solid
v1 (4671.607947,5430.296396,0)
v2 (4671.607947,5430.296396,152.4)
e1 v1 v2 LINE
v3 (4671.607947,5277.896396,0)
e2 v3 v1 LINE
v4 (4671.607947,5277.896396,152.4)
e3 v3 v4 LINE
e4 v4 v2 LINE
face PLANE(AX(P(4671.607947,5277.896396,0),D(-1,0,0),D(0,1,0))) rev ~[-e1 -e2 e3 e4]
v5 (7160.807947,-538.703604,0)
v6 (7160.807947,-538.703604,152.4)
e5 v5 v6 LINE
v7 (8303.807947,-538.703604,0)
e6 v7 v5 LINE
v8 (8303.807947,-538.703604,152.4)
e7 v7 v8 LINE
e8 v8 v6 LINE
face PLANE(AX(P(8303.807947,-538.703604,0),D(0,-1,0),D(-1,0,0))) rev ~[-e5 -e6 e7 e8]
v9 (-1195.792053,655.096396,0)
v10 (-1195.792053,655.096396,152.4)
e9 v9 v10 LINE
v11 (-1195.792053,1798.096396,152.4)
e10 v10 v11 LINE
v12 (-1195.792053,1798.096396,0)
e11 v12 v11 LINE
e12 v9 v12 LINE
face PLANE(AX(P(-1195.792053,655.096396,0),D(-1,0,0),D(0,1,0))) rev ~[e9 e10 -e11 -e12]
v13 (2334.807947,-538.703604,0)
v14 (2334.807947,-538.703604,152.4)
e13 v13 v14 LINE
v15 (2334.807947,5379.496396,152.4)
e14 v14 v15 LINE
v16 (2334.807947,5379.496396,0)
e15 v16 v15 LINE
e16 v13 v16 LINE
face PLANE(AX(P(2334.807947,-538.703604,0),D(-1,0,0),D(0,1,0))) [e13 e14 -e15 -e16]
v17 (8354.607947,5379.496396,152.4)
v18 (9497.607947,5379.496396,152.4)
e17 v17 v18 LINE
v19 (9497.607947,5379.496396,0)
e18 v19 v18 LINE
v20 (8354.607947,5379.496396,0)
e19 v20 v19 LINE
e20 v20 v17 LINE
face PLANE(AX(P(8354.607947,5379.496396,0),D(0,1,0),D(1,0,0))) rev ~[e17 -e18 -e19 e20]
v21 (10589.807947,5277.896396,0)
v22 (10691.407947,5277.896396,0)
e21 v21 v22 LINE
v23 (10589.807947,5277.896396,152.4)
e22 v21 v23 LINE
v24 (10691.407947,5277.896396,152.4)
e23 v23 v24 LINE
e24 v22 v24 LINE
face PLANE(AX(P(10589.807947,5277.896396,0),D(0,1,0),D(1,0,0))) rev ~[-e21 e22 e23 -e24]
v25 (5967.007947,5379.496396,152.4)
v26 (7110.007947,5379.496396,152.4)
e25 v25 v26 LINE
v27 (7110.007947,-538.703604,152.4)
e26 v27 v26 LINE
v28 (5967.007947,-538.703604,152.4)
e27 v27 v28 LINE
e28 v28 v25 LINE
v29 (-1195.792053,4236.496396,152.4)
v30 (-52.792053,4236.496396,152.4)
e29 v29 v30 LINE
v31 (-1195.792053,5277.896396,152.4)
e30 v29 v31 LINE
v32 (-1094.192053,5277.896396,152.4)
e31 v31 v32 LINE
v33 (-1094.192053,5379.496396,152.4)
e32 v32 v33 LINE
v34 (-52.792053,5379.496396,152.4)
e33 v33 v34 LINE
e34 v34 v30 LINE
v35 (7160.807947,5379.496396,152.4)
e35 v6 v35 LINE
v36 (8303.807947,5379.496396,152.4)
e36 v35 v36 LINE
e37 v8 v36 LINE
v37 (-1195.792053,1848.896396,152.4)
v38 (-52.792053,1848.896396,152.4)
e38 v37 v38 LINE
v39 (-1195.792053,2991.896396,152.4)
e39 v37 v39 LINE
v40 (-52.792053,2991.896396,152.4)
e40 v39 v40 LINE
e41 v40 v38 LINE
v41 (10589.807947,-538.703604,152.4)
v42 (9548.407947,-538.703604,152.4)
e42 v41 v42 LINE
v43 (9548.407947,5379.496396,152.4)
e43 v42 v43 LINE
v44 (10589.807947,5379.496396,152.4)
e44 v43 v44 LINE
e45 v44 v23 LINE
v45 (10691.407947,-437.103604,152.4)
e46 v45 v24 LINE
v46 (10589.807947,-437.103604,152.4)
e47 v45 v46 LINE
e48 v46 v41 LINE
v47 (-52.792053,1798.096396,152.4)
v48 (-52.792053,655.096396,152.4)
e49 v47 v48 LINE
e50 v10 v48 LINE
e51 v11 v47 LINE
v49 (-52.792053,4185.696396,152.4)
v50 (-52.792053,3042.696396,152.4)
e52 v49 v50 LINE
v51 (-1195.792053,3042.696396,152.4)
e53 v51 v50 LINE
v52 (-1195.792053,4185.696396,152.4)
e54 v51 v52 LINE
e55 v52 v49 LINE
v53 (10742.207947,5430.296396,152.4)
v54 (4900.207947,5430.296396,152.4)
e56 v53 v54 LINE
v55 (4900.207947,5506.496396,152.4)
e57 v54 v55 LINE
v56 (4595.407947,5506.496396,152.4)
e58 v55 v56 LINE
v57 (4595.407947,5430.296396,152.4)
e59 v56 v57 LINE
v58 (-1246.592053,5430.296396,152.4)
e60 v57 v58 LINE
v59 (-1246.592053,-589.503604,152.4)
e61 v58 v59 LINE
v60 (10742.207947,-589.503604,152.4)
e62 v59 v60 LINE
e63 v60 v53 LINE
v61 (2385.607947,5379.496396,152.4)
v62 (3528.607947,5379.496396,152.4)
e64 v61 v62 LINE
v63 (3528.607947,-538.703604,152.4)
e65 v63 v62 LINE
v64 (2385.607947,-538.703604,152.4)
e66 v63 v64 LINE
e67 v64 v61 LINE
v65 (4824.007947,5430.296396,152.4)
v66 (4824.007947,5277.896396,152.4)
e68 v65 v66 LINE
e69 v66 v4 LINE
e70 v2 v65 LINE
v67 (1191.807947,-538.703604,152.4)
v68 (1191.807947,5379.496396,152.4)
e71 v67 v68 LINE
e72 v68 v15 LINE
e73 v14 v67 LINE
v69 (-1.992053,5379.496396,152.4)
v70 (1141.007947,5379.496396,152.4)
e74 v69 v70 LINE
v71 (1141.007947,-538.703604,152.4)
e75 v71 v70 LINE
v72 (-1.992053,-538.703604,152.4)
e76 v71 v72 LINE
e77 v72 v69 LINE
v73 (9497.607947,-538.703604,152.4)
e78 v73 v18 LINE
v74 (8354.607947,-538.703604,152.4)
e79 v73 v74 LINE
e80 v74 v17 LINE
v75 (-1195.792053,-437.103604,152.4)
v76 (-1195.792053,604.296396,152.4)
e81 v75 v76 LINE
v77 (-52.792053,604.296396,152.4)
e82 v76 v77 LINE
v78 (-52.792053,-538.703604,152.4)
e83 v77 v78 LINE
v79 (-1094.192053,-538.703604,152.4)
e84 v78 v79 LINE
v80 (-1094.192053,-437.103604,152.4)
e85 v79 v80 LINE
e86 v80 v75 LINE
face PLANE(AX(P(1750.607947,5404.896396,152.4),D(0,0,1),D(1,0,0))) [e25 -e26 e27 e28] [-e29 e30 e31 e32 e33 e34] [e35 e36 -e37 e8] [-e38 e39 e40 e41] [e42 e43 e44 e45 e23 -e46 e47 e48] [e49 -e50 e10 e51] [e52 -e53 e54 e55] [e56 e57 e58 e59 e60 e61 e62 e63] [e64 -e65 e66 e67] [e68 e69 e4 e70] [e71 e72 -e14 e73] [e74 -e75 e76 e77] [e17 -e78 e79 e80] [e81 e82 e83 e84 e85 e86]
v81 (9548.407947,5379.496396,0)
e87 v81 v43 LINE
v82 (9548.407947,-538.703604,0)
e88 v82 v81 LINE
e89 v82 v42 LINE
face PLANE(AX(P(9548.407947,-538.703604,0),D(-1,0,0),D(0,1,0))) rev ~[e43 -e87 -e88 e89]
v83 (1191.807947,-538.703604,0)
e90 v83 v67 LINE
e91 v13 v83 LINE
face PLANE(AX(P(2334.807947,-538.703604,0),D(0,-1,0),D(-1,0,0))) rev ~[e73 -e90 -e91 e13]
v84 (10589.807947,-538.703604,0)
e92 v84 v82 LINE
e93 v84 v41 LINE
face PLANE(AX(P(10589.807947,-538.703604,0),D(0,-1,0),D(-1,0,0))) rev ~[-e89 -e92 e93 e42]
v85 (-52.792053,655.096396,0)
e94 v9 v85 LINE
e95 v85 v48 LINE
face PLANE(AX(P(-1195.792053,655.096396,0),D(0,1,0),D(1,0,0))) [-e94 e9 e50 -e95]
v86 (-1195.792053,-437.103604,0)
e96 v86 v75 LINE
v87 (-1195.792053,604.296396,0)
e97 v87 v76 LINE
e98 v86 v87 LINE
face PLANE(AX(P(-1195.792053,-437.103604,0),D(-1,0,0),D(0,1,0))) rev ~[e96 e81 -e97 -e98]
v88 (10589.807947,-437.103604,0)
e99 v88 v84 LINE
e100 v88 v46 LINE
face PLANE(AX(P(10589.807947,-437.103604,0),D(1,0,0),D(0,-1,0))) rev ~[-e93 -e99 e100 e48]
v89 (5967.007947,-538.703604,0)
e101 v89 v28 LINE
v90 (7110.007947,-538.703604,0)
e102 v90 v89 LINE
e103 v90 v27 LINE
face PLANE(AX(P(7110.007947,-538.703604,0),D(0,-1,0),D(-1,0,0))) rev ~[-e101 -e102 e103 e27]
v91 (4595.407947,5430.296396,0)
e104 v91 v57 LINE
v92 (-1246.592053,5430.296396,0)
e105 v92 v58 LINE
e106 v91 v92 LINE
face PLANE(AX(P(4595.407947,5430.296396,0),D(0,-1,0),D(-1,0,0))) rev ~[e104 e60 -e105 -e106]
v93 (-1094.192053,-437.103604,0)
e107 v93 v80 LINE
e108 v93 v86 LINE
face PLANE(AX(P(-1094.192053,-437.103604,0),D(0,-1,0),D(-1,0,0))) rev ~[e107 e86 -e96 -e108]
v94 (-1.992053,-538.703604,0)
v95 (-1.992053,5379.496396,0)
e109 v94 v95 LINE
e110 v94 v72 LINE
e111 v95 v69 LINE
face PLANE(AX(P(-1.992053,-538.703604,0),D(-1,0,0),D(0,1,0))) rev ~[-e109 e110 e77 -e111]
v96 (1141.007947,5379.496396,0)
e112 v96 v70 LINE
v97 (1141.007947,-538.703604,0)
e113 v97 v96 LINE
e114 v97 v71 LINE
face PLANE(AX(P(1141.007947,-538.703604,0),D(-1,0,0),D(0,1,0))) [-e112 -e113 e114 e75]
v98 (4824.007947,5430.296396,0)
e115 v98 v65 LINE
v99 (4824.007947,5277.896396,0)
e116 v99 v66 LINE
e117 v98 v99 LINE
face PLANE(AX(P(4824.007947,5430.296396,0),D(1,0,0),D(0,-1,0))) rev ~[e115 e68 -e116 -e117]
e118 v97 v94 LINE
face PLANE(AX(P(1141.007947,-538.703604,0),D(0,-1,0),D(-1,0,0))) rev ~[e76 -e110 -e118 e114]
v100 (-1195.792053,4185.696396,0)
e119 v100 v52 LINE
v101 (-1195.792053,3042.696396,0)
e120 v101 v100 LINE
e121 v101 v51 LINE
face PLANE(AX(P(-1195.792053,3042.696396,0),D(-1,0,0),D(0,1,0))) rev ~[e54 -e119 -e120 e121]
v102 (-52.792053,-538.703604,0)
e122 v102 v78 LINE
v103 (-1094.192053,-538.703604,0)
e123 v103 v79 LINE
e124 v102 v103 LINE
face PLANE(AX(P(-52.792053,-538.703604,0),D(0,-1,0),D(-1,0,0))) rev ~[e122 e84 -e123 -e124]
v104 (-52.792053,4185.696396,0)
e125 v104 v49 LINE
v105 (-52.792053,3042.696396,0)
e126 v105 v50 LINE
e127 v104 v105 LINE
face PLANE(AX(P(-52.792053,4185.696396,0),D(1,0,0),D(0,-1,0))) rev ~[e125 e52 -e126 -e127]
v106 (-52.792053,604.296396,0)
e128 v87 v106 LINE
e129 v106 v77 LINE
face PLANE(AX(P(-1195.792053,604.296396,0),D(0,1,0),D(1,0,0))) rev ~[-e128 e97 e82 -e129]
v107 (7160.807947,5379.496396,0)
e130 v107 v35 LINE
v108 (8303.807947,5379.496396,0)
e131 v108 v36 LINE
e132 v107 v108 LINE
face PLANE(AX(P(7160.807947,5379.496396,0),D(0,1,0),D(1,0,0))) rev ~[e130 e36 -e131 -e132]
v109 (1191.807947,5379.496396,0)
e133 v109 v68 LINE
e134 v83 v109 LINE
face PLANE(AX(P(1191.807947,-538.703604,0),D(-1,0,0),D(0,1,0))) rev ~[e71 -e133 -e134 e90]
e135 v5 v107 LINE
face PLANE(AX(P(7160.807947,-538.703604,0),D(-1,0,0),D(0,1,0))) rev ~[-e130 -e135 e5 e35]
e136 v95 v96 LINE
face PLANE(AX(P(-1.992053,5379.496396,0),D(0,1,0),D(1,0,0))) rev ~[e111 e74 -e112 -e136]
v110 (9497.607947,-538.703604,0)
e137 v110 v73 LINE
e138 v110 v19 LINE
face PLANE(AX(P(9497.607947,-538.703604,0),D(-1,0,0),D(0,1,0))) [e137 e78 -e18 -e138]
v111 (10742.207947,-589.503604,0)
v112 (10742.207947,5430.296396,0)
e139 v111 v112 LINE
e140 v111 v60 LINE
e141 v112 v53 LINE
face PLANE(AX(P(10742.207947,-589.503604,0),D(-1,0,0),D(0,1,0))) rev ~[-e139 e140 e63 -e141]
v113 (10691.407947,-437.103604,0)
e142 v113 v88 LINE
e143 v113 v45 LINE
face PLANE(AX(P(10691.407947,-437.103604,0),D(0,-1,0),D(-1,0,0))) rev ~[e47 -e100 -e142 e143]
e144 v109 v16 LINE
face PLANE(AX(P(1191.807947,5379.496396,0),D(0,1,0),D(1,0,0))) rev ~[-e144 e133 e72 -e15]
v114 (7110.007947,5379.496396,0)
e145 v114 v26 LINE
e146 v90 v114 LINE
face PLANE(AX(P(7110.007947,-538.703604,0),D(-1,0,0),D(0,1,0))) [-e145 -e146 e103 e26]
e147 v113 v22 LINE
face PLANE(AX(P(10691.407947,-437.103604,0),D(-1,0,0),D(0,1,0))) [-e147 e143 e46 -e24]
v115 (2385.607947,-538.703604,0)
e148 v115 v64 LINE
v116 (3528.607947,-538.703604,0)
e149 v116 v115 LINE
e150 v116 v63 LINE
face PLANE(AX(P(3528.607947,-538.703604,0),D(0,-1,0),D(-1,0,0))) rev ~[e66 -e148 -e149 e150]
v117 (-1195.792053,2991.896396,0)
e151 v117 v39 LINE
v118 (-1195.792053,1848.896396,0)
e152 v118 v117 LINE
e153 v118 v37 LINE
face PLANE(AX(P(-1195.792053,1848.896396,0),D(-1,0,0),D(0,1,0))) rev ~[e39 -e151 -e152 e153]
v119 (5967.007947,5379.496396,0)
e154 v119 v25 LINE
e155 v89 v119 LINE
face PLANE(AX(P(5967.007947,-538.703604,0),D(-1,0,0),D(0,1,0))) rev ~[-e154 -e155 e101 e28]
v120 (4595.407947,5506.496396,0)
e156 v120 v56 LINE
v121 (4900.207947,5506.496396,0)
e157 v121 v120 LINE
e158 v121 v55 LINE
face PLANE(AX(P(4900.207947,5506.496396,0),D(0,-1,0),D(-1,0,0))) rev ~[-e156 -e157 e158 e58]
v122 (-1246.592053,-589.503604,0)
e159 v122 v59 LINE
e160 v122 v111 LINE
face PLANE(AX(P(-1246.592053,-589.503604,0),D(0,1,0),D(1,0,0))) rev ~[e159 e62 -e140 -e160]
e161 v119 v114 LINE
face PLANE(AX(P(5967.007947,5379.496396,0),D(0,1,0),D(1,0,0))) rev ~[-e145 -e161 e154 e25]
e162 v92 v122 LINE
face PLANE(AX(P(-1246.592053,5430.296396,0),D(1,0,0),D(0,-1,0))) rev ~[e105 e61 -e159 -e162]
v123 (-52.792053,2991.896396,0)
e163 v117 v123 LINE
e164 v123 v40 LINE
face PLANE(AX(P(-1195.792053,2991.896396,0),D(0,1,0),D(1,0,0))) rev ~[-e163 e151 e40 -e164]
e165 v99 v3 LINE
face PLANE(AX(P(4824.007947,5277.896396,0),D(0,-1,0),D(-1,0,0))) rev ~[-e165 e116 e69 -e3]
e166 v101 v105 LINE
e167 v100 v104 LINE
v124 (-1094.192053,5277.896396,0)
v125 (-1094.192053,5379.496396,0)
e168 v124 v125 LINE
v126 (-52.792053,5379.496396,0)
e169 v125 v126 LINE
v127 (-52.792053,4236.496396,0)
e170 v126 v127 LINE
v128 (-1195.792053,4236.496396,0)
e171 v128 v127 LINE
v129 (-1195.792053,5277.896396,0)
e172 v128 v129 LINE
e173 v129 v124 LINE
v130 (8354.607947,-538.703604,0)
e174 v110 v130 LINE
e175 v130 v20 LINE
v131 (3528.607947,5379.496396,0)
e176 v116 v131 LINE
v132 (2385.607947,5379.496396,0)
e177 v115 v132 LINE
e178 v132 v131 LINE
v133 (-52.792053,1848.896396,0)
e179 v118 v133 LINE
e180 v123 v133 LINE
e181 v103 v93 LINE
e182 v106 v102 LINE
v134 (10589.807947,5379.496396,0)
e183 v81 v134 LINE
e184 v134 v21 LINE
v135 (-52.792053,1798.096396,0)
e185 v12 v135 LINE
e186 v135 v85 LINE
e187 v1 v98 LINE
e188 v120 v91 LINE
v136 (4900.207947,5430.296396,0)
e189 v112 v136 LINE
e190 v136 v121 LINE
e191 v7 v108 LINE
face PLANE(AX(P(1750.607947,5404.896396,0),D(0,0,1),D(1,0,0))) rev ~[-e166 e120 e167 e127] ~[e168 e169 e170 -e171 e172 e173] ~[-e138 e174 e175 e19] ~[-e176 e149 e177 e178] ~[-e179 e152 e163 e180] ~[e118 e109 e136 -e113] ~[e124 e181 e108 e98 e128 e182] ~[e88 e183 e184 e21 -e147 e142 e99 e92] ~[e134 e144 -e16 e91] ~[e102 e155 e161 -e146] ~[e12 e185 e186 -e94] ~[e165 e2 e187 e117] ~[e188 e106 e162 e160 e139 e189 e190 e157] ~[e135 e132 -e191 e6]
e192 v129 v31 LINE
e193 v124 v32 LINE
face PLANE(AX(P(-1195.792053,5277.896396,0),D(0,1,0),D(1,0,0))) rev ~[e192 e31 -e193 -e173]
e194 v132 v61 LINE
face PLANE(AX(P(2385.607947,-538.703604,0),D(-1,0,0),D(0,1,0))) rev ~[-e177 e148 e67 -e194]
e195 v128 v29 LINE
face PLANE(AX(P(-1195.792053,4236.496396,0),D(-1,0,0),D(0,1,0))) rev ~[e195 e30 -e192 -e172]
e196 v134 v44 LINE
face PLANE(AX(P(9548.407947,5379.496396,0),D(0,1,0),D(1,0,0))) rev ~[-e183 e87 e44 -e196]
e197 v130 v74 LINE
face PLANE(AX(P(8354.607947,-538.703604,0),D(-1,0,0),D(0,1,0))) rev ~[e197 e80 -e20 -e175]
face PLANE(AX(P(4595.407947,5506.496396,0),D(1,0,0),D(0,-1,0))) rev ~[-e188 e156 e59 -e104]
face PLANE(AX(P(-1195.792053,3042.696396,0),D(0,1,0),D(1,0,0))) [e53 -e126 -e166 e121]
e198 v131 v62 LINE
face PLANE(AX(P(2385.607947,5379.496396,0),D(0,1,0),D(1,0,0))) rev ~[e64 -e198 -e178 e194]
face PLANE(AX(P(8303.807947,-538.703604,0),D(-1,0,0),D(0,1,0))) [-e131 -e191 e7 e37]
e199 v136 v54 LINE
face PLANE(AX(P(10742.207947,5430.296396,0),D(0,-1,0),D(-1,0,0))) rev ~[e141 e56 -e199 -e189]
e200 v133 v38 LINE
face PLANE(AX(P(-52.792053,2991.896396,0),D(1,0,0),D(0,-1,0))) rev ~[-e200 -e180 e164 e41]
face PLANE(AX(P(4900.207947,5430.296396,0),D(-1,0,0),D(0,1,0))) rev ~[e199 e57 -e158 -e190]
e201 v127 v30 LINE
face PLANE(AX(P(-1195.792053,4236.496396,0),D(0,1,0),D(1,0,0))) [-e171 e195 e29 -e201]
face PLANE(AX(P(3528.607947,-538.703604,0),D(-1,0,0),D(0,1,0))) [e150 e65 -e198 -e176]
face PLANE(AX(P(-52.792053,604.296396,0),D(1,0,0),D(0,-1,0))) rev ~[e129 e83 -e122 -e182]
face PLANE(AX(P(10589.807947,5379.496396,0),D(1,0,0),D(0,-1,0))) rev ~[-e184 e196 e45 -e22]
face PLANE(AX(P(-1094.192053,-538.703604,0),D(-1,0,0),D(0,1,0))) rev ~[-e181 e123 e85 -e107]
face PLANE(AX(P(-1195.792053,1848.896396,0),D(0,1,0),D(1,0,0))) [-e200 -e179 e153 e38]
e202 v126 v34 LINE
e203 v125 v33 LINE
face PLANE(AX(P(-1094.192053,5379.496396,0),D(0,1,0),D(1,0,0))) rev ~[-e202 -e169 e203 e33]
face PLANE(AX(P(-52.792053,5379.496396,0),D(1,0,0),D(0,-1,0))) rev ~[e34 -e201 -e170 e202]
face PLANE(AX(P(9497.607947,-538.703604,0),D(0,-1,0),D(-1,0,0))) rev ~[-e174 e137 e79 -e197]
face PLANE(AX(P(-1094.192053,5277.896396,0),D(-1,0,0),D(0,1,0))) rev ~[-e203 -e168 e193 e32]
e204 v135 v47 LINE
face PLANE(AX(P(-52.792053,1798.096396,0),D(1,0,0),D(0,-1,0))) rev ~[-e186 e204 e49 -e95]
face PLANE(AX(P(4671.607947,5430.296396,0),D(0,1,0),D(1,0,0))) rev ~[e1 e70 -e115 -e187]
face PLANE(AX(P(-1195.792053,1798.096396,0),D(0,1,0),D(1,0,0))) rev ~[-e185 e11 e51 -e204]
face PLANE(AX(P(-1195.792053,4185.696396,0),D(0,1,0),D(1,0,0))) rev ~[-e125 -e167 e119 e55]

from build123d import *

# Parameters (mm, degrees)
F0_W     = 50.8
F0_H     = 5918.2
F0_W_2   = 1143
F0_H_2   = 50.8
F0_W_3   = 76.2
F0_H_3   = 5740.4
F0_H_4   = 76.2
F0_H_5   = 5715
F1_DEPTH = 152.4


# Not quite as in the source:
# - a feature names something its author has since deleted; it is built from what else it names


with BuildPart() as f1:
    # F0 (on Top) → F1 (new body)
    with BuildSketch(Plane.XY):
        Polygon((-1.9920532227, 5379.496395874), (1141.0079467773, 5379.496395874), (1191.8079467773, 5379.496395874), (2334.8079467773, 5379.496395874), (2385.6079467774, 5379.496395874), (3528.6079467773, 5379.496395874), (3579.4079467774, 5379.496395874), (4595.4079467774, 5379.496395874), (4595.4079467774, 5430.296395874), (-1094.1920532227, 5430.296395874), (-1094.1920532227, 5379.496395874), (-52.7920532227, 5379.496395874), align=None)
        with Locations((1166.4079467773, 2420.396395874)):
            Rectangle(F0_W, F0_H)
        Polygon((1191.8079467773, -538.703604126), (1141.0079467773, -538.703604126), (-1.9920532227, -538.703604126), (-52.7920532227, -538.703604126), (-1094.1920532227, -538.703604126), (-1094.1920532227, -589.503604126), (10589.8079467774, -589.503604126), (10589.8079467774, -538.703604126), (9548.4079467774, -538.703604126), (9497.6079467774, -538.703604126), (8354.6079467774, -538.703604126), (8303.8079467774, -538.703604126), (7160.8079467774, -538.703604126), (7110.0079467774, -538.703604126), (5967.0079467774, -538.703604126), (5916.2079467774, -538.703604126), (4773.2079467774, -538.703604126), (4722.4079467774, -538.703604126), (3579.4079467774, -538.703604126), (3528.6079467774, -538.703604126), (2385.6079467774, -538.703604126), (2334.8079467773, -538.703604126), align=None)
        Polygon((-1.9920532227, -538.703604126), (-1.9920532227, 5379.496395874), (-52.7920532227, 5379.496395874), (-52.7920532227, 4236.496395874), (-52.7920532227, 4185.696395874), (-52.7920532227, 3042.696395874), (-52.7920532227, 2991.896395874), (-52.7920532227, 1848.896395874), (-52.7920532227, 1798.096395874), (-52.7920532227, 655.096395874), (-52.7920532227, 604.296395874), (-52.7920532227, -538.703604126), align=None)
        with Locations((2360.2079467773, 2420.396395874)):
            Rectangle(F0_W, F0_H)
        with Locations((-624.2920532227, 4211.096395874)):
            Rectangle(F0_W_2, F0_H_2)
        Polygon((-1094.1920532227, 5277.896395874), (-1094.1920532227, 5379.496395874), (-1094.1920532227, 5430.296395874), (-1246.5920532227, 5430.296395874), (-1246.5920532227, 5277.896395874), (-1195.7920532227, 5277.896395874), align=None)
        with Locations((3554.0079467774, 2420.396395874)):
            Rectangle(F0_W, F0_H)
        with Locations((-624.2920532227, 629.696395874)):
            Rectangle(F0_W_2, F0_H_2)
        Polygon((-1094.1920532227, -589.503604126), (-1094.1920532227, -538.703604126), (-1094.1920532227, -437.103604126), (-1195.7920532227, -437.103604126), (-1246.5920532227, -437.103604126), (-1246.5920532227, -589.503604126), align=None)
        Polygon((-1195.7920532227, 4185.696395874), (-1195.7920532227, 4236.496395874), (-1195.7920532227, 5277.896395874), (-1246.5920532227, 5277.896395874), (-1246.5920532227, -437.103604126), (-1195.7920532227, -437.103604126), (-1195.7920532227, 604.296395874), (-1195.7920532227, 655.096395874), (-1195.7920532227, 1798.096395874), (-1195.7920532227, 1848.896395874), (-1195.7920532227, 2991.896395874), (-1195.7920532227, 3042.696395874), align=None)
        Polygon((4595.4079467774, 5379.496395874), (3579.4079467774, 5379.496395874), (3579.4079467774, -538.703604126), (4722.4079467774, -538.703604126), (4722.4079467774, 5201.696395874), (4595.4079467774, 5201.696395874), align=None)
        with Locations((-624.2920532227, 3017.296395874)):
            Rectangle(F0_W_2, F0_H_2)
        Polygon((4595.4079467774, 5506.496395874), (4595.4079467774, 5430.296395874), (4671.6079467774, 5430.296395874), (4824.0079467774, 5430.296395874), (4900.2079467774, 5430.296395874), (4900.2079467774, 5506.496395874), align=None)
        with Locations((4633.5079467774, 5404.896395874)):
            Rectangle(F0_W_3, F0_H_2)
        Polygon((4671.6079467774, 5379.496395874), (4595.4079467774, 5379.496395874), (4595.4079467774, 5201.696395874), (4722.4079467774, 5201.696395874), (4722.4079467774, 5277.896395874), (4671.6079467774, 5277.896395874), align=None)
        with Locations((-624.2920532227, 1823.496395874)):
            Rectangle(F0_W_2, F0_H_2)
        Polygon((10589.8079467774, -538.703604126), (10589.8079467774, -589.503604126), (10742.2079467774, -589.503604126), (10742.2079467774, -437.103604126), (10691.4079467774, -437.103604126), (10589.8079467774, -437.103604126), align=None)
        with Locations((4747.8079467774, 2331.496395874)):
            Rectangle(F0_W, F0_H_3)
        with Locations((4862.1079467774, 5404.896395874)):
            Rectangle(F0_W_3, F0_H_2)
        Polygon((4773.2079467774, 5201.696395874), (4773.2079467774, -538.703604126), (5916.2079467774, -538.703604126), (5916.2079467774, 5379.496395874), (4900.2079467774, 5379.496395874), (4900.2079467774, 5201.696395874), align=None)
        with Locations((4747.8079467774, 5239.796395874)):
            Rectangle(F0_W, F0_H_4)
        with Locations((9523.0079467774, 2420.396395874)):
            Rectangle(F0_W, F0_H)
        with Locations((10716.8079467774, 2420.396395874)):
            Rectangle(F0_W, F0_H_5)
        Polygon((10589.8079467774, 5430.296395874), (4900.2079467774, 5430.296395874), (4900.2079467774, 5379.496395874), (5916.2079467774, 5379.496395874), (5967.0079467774, 5379.496395874), (7110.0079467774, 5379.496395874), (7160.8079467774, 5379.496395874), (8303.8079467774, 5379.496395874), (8354.6079467774, 5379.496395874), (9497.6079467774, 5379.496395874), (9548.4079467774, 5379.496395874), (10589.8079467774, 5379.496395874), align=None)
        Polygon((4900.2079467774, 5379.496395874), (4824.0079467774, 5379.496395874), (4824.0079467774, 5277.896395874), (4773.2079467774, 5277.896395874), (4773.2079467774, 5201.696395874), (4900.2079467774, 5201.696395874), align=None)
        with Locations((5941.6079467774, 2420.396395874)):
            Rectangle(F0_W, F0_H)
        Polygon((10691.4079467774, 5277.896395874), (10742.2079467774, 5277.896395874), (10742.2079467774, 5430.296395874), (10589.8079467774, 5430.296395874), (10589.8079467774, 5379.496395874), (10589.8079467774, 5277.896395874), align=None)
        with Locations((8329.2079467774, 2420.396395874)):
            Rectangle(F0_W, F0_H)
        with Locations((7135.4079467774, 2420.396395874)):
            Rectangle(F0_W, F0_H)
    extrude(amount=F1_DEPTH)


solid = f1.part
